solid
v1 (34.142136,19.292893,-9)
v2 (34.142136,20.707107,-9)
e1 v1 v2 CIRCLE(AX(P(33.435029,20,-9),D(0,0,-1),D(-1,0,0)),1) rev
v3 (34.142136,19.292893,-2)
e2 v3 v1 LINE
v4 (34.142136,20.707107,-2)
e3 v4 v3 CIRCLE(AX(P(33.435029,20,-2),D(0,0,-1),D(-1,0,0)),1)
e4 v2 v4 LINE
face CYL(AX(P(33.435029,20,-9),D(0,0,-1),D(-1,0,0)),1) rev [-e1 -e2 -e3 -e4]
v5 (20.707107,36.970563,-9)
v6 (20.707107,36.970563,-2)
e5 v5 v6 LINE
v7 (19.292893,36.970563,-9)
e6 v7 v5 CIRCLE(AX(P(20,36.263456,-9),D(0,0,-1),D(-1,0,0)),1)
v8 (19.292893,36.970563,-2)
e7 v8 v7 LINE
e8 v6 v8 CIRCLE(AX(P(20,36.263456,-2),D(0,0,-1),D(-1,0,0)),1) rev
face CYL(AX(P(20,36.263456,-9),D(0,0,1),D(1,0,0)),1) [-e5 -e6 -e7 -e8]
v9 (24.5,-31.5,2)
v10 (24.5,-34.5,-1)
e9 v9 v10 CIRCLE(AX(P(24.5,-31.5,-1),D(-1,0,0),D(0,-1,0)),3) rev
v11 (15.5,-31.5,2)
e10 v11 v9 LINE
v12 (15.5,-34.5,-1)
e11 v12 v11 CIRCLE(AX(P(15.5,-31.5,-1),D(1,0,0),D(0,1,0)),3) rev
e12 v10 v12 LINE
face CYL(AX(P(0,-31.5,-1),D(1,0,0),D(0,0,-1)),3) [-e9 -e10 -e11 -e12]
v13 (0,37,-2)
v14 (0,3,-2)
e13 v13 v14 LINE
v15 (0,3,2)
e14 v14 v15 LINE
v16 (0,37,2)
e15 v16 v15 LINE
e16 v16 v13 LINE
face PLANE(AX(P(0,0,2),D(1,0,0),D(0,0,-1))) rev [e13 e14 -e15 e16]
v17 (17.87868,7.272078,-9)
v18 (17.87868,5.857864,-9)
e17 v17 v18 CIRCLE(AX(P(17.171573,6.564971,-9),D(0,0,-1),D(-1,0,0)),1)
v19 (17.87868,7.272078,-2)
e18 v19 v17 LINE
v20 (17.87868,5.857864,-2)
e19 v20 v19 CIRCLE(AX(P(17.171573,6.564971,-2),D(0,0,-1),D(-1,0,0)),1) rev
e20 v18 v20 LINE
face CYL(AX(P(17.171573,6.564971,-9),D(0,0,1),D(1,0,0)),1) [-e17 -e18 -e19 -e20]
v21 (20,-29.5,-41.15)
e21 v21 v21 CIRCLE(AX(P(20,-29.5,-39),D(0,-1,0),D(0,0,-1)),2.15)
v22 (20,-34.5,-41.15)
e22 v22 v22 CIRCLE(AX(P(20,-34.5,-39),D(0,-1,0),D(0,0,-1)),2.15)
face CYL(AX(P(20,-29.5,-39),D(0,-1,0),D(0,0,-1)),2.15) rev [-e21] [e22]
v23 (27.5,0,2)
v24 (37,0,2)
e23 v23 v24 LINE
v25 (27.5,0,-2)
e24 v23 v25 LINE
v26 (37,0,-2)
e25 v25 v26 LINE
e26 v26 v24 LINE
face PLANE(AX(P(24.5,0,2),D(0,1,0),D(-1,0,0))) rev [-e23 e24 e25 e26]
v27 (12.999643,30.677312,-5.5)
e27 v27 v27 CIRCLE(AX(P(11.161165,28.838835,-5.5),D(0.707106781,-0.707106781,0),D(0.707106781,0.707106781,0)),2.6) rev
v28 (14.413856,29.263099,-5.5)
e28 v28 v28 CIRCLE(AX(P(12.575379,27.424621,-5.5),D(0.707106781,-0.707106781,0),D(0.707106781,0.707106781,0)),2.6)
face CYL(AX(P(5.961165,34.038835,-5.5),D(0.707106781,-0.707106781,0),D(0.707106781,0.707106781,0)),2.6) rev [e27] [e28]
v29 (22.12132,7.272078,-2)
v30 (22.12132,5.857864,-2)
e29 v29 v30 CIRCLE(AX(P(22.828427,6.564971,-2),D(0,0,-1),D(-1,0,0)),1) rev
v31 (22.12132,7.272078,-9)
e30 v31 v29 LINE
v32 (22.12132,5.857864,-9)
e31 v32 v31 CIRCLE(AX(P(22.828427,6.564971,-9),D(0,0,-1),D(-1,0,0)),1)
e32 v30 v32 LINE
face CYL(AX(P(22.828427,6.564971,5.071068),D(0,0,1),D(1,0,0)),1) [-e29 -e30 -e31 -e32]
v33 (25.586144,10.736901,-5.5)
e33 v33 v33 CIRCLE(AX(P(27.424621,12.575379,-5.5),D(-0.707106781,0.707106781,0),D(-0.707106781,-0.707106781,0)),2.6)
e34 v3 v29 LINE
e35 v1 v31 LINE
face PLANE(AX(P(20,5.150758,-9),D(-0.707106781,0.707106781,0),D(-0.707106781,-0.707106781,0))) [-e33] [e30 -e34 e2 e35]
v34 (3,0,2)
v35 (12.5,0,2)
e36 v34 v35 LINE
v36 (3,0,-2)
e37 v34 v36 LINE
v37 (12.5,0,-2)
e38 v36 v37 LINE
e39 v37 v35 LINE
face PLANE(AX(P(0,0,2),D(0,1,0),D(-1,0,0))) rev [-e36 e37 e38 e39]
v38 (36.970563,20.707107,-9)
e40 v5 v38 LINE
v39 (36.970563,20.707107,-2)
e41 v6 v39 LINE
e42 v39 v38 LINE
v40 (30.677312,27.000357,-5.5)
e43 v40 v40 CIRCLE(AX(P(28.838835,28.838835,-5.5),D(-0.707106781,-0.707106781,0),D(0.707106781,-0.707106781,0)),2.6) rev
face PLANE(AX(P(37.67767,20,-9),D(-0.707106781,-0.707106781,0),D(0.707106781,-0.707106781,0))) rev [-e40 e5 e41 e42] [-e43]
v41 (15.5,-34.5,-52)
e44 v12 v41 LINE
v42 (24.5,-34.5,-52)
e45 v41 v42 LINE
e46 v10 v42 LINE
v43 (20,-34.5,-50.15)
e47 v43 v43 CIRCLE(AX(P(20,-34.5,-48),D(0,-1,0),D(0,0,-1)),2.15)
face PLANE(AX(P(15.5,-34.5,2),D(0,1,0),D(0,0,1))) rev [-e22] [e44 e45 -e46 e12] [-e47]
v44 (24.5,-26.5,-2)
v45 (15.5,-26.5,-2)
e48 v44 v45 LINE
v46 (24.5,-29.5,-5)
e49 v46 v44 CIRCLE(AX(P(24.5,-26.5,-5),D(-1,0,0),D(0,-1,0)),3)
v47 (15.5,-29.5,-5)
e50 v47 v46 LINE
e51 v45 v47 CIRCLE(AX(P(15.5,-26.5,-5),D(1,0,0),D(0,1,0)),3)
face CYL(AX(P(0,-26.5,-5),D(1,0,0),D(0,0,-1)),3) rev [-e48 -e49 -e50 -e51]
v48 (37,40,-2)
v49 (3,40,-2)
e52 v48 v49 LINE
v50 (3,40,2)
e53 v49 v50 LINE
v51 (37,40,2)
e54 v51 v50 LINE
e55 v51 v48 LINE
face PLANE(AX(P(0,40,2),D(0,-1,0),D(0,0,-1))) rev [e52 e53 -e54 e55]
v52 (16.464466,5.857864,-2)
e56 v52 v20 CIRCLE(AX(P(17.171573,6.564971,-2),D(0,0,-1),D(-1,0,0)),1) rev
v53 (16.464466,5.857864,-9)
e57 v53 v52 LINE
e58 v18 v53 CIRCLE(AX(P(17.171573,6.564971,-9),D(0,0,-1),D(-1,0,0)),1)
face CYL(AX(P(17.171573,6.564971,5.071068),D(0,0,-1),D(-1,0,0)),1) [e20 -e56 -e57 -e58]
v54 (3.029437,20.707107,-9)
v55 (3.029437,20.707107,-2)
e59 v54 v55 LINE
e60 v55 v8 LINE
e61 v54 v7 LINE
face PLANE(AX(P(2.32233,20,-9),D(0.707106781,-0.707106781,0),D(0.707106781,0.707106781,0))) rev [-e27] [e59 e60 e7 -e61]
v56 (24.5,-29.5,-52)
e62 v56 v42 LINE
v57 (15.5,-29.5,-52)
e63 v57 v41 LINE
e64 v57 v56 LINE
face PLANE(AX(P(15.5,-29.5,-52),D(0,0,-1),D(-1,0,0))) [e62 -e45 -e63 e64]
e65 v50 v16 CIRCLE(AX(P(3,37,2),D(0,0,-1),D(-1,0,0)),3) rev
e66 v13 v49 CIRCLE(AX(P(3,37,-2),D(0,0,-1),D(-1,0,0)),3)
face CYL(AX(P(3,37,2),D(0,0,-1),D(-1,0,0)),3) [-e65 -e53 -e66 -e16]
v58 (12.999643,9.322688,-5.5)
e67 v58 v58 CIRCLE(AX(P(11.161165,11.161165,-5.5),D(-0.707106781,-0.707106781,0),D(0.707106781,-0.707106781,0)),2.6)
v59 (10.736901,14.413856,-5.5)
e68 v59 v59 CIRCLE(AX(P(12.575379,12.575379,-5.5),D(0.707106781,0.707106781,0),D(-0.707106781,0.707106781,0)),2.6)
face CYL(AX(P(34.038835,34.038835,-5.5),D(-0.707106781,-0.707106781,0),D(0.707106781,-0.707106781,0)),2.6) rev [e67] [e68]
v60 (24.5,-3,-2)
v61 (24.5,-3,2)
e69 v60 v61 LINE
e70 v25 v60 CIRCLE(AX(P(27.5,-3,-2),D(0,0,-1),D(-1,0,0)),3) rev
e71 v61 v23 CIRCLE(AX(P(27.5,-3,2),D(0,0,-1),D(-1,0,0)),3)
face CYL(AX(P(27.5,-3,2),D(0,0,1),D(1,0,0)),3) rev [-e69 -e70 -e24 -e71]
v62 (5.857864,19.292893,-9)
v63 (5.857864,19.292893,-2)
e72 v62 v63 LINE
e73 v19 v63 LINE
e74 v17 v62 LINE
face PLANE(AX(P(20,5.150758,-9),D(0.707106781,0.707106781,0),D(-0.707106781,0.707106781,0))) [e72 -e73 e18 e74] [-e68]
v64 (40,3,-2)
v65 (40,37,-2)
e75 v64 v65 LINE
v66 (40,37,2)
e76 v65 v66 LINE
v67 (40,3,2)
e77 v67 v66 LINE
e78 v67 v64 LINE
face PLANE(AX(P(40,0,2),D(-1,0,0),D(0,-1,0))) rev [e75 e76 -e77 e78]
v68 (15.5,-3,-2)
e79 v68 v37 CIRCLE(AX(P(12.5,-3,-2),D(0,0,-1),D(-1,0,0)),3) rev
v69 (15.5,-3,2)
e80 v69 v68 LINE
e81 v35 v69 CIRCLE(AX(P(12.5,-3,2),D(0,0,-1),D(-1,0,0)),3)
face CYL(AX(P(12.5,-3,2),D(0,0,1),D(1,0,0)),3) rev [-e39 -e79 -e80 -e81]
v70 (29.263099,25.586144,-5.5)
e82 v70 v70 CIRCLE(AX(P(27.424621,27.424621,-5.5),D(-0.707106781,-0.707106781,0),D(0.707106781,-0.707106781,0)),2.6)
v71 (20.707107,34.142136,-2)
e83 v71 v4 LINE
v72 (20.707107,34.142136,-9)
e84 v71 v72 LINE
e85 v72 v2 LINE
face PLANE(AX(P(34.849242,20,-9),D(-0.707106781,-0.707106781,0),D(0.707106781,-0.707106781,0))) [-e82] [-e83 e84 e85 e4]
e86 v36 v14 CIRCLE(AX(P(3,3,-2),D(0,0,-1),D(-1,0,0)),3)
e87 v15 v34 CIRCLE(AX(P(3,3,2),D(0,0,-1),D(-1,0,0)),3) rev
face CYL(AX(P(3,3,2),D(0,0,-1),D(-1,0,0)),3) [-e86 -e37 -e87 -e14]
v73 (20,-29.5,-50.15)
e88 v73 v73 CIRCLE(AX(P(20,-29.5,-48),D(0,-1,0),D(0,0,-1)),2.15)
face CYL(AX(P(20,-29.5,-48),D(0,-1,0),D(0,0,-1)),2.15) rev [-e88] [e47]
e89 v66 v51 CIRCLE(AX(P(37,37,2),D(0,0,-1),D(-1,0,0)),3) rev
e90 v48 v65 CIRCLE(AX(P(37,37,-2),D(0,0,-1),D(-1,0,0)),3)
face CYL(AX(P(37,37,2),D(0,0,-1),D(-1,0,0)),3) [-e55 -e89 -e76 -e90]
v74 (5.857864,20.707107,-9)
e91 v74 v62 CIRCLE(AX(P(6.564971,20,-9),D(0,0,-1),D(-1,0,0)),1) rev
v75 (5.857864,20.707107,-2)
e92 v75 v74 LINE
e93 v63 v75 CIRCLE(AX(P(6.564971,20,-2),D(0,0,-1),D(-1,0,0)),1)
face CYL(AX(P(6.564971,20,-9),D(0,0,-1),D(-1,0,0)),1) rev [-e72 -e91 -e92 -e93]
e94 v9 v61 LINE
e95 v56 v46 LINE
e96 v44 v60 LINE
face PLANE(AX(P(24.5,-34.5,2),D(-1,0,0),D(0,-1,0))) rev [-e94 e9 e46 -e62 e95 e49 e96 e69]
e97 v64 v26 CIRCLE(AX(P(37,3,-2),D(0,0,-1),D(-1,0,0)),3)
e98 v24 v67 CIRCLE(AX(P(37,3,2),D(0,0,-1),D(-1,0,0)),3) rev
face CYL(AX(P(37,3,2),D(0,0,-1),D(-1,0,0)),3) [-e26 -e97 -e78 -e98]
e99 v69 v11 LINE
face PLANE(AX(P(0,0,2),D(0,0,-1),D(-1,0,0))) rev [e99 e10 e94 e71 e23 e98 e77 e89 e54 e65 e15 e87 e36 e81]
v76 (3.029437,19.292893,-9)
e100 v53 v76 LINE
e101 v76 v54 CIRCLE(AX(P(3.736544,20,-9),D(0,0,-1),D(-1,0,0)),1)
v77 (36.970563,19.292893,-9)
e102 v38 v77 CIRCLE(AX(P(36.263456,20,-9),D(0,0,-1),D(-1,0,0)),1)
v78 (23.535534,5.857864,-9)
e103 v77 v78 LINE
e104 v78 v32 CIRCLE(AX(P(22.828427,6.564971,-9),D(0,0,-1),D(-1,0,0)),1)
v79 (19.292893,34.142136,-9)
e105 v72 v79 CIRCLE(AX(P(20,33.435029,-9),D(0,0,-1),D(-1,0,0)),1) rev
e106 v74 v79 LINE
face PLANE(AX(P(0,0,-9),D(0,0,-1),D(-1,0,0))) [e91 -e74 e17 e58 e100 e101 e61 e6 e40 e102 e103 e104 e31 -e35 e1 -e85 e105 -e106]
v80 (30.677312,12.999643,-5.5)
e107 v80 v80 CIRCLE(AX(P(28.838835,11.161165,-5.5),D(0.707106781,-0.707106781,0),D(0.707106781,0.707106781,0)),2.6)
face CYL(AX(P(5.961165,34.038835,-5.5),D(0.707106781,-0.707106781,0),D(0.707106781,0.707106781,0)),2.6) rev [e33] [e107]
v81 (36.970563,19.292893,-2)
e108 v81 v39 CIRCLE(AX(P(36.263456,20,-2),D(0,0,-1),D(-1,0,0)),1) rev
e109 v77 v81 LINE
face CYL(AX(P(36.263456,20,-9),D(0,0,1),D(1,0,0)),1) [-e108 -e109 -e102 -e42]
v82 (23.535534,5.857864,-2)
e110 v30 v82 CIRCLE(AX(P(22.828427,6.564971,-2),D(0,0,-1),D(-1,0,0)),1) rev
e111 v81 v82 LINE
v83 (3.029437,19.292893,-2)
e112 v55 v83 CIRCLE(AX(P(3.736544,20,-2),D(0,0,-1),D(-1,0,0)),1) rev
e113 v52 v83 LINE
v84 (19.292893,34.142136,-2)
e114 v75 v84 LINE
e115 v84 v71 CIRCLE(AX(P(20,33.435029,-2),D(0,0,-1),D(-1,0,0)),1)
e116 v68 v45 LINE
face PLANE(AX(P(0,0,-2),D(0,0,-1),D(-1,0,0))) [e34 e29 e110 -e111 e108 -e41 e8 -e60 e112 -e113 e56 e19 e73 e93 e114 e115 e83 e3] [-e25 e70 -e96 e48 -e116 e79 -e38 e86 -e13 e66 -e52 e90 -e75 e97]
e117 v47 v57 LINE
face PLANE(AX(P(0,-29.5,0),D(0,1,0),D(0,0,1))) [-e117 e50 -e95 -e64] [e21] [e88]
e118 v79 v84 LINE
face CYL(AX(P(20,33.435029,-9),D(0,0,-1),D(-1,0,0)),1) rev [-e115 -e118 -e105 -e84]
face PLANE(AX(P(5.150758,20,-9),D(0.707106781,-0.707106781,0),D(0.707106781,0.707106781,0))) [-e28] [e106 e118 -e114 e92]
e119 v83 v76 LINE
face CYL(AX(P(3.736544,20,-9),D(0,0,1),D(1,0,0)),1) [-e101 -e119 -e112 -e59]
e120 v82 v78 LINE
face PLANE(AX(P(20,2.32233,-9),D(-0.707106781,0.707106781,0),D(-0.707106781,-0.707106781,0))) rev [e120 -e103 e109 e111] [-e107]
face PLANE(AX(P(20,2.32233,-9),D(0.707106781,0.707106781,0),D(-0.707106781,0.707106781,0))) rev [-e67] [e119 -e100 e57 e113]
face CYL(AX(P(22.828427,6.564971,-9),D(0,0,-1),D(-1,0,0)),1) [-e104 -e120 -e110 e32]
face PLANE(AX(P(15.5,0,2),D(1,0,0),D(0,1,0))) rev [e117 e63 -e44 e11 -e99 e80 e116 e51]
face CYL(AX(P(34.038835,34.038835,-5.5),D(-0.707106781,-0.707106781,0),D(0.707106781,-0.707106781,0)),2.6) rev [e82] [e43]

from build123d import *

# Parameters (mm, degrees)
BOSS_EXTRUDE1_DEPTH = 2
SKETCH3_W           = 9
SKETCH3_H           = 50
SKETCH3_R           = 2.15
BOSS_EXTRUDE2_DEPTH = 5
FILLET1_R           = 3
BOSS_EXTRUDE3_DEPTH = 7
CUT_EXTRUDE1_REACH  = 76.971
SKETCH5_R           = 2.6
CUT_EXTRUDE2_REACH  = 79.848
SKETCH7_R           = 2.6
CUT_EXTRUDE3_DEPTH  = 7
FILLET2_R           = 1


with BuildPart() as part:
    # Sketch1 → Boss-Extrude1 (new, symmetric)
    with BuildSketch(Plane.XY):
        Polygon((0, 0), (15.5, 0), (15.5, -34.5), (24.5, -34.5), (24.5, 0), (40, 0), (40, 40), (0, 40), align=None)
    extrude(amount=BOSS_EXTRUDE1_DEPTH, both=True)

    # Sketch3 → Boss-Extrude2 (add)
    with BuildSketch(Plane.XZ.offset(34.5)):
        with Locations((20, -27)):
            Rectangle(SKETCH3_W, SKETCH3_H)
        with Locations(Location((20, -48, 0), (0, 0, 270))):
            Circle(SKETCH3_R, mode=Mode.SUBTRACT)
        with Locations(Location((20, -39, 0), (0, 0, 270))):
            Circle(SKETCH3_R, mode=Mode.SUBTRACT)
    extrude(amount=-BOSS_EXTRUDE2_DEPTH)

    # Fillet1
    fillet1_edges = [part.edges().sort_by_distance(p)[0] for p in [
        (0, 40, 0),
        (40, 40, 0),
        (40, 0, 0),
        (24.5, 0, 0),
        (15.5, 0, 0),
        (0, 0, 0),
        (20, -34.5, 2),
        (20, -29.5, -2),
    ]]
    fillet(fillet1_edges, radius=FILLET1_R)

    # Sketch4 → Boss-Extrude3 (add)
    with BuildSketch(Plane(origin=(0, 0, -2), x_dir=(-1, 0, 0), z_dir=(0, 0, -1))):
        Polygon((-20, 2.32233047), (-37.67766953, 20), (-20, 37.67766953), (-2.32233047, 20), align=None)
        Polygon((-20, 5.150757595), (-34.849242405, 20), (-20, 34.849242405), (-5.150757595, 20), align=None, mode=Mode.SUBTRACT)
    extrude(amount=BOSS_EXTRUDE3_DEPTH)

    # Cut-Extrude1: up to this face of the body (flat: up to its plane)
    cut_extrude1_end = Plane(part.part.faces().sort_by_distance((28.838834765, 28.838834765, -5.5))[0])
    # Sketch5 → Cut-Extrude1 (cut, up to the picked face)
    with BuildSketch(Plane(origin=(11.161165235, 11.161165235, 0), x_dir=(0, 0, 1), z_dir=(-0.7071067811865398, -0.7071067811865552, 0)), mode=Mode.PRIVATE) as cut_extrude1_sk1:
        with Locations(Location((-5.5, 0, 0), (0, 0, 270))):
            Circle(SKETCH5_R)
    cut_extrude1_tool1 = split(extrude(cut_extrude1_sk1.sketch, amount=-CUT_EXTRUDE1_REACH, mode=Mode.PRIVATE), bisect_by=cut_extrude1_end, keep=Keep.BOTH, mode=Mode.PRIVATE)
    add(cut_extrude1_tool1.solids().sort_by(Axis((11.161165, 11.161165, -5.5), (0.7071067811865398, 0.7071067811865552, 0)))[0], mode=Mode.SUBTRACT)

    # Cut-Extrude2: up to this face of the body (flat: up to its plane)
    cut_extrude2_end = Plane(part.part.faces().sort_by_distance((11.161165235, 28.838834765, -5.5))[0])
    # Sketch7 → Cut-Extrude2 (cut, up to the picked face)
    with BuildSketch(Plane(origin=(8.838834765, -8.838834765, 0), x_dir=(0.7071067811865399, 0.7071067811865551, 0), z_dir=(0.7071067811865551, -0.7071067811865399, 0)), mode=Mode.PRIVATE) as cut_extrude2_sk1:
        with Locations((28.284271248, -5.5)):
            Circle(SKETCH7_R)
    cut_extrude2_tool1 = split(extrude(cut_extrude2_sk1.sketch, amount=-CUT_EXTRUDE2_REACH, mode=Mode.PRIVATE), bisect_by=cut_extrude2_end, keep=Keep.BOTH, mode=Mode.PRIVATE)
    add(cut_extrude2_tool1.solids().sort_by(Axis((28.838835, 11.161165, -5.5), (-0.7071067811865551, 0.7071067811865399, 0)))[0], mode=Mode.SUBTRACT)

    # Sketch9 → Cut-Extrude3 (cut)
    with BuildSketch(Plane(origin=(0, 0, -9), x_dir=(-1, 0, 0), z_dir=(0, 0, -1))):
        Polygon((-22.828427125, 5.150757595), (-20, 2.32233047), (-17.171572875, 5.150757595), (-18.585786438, 6.564971157), (-20, 5.150757595), (-21.414213562, 6.564971157), align=None)
    extrude(amount=-CUT_EXTRUDE3_DEPTH, mode=Mode.SUBTRACT)

    # Fillet2
    fillet2_edges = [part.edges().sort_by_distance(p)[0] for p in [
        (21.414213562, 6.564971157, -5.5),
        (18.585786438, 6.564971157, -5.5),
        (17.171572875, 5.150757595, -5.5),
        (22.828427125, 5.150757595, -5.5),
        (5.150757595, 20, -5.5),
        (2.32233047, 20, -5.5),
        (20, 37.67766953, -5.5),
        (20, 34.849242405, -5.5),
        (34.849242405, 20, -5.5),
        (37.67766953, 20, -5.5),
    ]]
    fillet(fillet2_edges, radius=FILLET2_R - 0.0001)  # a hair under: the kernel refuses the full size


solid = part.part
